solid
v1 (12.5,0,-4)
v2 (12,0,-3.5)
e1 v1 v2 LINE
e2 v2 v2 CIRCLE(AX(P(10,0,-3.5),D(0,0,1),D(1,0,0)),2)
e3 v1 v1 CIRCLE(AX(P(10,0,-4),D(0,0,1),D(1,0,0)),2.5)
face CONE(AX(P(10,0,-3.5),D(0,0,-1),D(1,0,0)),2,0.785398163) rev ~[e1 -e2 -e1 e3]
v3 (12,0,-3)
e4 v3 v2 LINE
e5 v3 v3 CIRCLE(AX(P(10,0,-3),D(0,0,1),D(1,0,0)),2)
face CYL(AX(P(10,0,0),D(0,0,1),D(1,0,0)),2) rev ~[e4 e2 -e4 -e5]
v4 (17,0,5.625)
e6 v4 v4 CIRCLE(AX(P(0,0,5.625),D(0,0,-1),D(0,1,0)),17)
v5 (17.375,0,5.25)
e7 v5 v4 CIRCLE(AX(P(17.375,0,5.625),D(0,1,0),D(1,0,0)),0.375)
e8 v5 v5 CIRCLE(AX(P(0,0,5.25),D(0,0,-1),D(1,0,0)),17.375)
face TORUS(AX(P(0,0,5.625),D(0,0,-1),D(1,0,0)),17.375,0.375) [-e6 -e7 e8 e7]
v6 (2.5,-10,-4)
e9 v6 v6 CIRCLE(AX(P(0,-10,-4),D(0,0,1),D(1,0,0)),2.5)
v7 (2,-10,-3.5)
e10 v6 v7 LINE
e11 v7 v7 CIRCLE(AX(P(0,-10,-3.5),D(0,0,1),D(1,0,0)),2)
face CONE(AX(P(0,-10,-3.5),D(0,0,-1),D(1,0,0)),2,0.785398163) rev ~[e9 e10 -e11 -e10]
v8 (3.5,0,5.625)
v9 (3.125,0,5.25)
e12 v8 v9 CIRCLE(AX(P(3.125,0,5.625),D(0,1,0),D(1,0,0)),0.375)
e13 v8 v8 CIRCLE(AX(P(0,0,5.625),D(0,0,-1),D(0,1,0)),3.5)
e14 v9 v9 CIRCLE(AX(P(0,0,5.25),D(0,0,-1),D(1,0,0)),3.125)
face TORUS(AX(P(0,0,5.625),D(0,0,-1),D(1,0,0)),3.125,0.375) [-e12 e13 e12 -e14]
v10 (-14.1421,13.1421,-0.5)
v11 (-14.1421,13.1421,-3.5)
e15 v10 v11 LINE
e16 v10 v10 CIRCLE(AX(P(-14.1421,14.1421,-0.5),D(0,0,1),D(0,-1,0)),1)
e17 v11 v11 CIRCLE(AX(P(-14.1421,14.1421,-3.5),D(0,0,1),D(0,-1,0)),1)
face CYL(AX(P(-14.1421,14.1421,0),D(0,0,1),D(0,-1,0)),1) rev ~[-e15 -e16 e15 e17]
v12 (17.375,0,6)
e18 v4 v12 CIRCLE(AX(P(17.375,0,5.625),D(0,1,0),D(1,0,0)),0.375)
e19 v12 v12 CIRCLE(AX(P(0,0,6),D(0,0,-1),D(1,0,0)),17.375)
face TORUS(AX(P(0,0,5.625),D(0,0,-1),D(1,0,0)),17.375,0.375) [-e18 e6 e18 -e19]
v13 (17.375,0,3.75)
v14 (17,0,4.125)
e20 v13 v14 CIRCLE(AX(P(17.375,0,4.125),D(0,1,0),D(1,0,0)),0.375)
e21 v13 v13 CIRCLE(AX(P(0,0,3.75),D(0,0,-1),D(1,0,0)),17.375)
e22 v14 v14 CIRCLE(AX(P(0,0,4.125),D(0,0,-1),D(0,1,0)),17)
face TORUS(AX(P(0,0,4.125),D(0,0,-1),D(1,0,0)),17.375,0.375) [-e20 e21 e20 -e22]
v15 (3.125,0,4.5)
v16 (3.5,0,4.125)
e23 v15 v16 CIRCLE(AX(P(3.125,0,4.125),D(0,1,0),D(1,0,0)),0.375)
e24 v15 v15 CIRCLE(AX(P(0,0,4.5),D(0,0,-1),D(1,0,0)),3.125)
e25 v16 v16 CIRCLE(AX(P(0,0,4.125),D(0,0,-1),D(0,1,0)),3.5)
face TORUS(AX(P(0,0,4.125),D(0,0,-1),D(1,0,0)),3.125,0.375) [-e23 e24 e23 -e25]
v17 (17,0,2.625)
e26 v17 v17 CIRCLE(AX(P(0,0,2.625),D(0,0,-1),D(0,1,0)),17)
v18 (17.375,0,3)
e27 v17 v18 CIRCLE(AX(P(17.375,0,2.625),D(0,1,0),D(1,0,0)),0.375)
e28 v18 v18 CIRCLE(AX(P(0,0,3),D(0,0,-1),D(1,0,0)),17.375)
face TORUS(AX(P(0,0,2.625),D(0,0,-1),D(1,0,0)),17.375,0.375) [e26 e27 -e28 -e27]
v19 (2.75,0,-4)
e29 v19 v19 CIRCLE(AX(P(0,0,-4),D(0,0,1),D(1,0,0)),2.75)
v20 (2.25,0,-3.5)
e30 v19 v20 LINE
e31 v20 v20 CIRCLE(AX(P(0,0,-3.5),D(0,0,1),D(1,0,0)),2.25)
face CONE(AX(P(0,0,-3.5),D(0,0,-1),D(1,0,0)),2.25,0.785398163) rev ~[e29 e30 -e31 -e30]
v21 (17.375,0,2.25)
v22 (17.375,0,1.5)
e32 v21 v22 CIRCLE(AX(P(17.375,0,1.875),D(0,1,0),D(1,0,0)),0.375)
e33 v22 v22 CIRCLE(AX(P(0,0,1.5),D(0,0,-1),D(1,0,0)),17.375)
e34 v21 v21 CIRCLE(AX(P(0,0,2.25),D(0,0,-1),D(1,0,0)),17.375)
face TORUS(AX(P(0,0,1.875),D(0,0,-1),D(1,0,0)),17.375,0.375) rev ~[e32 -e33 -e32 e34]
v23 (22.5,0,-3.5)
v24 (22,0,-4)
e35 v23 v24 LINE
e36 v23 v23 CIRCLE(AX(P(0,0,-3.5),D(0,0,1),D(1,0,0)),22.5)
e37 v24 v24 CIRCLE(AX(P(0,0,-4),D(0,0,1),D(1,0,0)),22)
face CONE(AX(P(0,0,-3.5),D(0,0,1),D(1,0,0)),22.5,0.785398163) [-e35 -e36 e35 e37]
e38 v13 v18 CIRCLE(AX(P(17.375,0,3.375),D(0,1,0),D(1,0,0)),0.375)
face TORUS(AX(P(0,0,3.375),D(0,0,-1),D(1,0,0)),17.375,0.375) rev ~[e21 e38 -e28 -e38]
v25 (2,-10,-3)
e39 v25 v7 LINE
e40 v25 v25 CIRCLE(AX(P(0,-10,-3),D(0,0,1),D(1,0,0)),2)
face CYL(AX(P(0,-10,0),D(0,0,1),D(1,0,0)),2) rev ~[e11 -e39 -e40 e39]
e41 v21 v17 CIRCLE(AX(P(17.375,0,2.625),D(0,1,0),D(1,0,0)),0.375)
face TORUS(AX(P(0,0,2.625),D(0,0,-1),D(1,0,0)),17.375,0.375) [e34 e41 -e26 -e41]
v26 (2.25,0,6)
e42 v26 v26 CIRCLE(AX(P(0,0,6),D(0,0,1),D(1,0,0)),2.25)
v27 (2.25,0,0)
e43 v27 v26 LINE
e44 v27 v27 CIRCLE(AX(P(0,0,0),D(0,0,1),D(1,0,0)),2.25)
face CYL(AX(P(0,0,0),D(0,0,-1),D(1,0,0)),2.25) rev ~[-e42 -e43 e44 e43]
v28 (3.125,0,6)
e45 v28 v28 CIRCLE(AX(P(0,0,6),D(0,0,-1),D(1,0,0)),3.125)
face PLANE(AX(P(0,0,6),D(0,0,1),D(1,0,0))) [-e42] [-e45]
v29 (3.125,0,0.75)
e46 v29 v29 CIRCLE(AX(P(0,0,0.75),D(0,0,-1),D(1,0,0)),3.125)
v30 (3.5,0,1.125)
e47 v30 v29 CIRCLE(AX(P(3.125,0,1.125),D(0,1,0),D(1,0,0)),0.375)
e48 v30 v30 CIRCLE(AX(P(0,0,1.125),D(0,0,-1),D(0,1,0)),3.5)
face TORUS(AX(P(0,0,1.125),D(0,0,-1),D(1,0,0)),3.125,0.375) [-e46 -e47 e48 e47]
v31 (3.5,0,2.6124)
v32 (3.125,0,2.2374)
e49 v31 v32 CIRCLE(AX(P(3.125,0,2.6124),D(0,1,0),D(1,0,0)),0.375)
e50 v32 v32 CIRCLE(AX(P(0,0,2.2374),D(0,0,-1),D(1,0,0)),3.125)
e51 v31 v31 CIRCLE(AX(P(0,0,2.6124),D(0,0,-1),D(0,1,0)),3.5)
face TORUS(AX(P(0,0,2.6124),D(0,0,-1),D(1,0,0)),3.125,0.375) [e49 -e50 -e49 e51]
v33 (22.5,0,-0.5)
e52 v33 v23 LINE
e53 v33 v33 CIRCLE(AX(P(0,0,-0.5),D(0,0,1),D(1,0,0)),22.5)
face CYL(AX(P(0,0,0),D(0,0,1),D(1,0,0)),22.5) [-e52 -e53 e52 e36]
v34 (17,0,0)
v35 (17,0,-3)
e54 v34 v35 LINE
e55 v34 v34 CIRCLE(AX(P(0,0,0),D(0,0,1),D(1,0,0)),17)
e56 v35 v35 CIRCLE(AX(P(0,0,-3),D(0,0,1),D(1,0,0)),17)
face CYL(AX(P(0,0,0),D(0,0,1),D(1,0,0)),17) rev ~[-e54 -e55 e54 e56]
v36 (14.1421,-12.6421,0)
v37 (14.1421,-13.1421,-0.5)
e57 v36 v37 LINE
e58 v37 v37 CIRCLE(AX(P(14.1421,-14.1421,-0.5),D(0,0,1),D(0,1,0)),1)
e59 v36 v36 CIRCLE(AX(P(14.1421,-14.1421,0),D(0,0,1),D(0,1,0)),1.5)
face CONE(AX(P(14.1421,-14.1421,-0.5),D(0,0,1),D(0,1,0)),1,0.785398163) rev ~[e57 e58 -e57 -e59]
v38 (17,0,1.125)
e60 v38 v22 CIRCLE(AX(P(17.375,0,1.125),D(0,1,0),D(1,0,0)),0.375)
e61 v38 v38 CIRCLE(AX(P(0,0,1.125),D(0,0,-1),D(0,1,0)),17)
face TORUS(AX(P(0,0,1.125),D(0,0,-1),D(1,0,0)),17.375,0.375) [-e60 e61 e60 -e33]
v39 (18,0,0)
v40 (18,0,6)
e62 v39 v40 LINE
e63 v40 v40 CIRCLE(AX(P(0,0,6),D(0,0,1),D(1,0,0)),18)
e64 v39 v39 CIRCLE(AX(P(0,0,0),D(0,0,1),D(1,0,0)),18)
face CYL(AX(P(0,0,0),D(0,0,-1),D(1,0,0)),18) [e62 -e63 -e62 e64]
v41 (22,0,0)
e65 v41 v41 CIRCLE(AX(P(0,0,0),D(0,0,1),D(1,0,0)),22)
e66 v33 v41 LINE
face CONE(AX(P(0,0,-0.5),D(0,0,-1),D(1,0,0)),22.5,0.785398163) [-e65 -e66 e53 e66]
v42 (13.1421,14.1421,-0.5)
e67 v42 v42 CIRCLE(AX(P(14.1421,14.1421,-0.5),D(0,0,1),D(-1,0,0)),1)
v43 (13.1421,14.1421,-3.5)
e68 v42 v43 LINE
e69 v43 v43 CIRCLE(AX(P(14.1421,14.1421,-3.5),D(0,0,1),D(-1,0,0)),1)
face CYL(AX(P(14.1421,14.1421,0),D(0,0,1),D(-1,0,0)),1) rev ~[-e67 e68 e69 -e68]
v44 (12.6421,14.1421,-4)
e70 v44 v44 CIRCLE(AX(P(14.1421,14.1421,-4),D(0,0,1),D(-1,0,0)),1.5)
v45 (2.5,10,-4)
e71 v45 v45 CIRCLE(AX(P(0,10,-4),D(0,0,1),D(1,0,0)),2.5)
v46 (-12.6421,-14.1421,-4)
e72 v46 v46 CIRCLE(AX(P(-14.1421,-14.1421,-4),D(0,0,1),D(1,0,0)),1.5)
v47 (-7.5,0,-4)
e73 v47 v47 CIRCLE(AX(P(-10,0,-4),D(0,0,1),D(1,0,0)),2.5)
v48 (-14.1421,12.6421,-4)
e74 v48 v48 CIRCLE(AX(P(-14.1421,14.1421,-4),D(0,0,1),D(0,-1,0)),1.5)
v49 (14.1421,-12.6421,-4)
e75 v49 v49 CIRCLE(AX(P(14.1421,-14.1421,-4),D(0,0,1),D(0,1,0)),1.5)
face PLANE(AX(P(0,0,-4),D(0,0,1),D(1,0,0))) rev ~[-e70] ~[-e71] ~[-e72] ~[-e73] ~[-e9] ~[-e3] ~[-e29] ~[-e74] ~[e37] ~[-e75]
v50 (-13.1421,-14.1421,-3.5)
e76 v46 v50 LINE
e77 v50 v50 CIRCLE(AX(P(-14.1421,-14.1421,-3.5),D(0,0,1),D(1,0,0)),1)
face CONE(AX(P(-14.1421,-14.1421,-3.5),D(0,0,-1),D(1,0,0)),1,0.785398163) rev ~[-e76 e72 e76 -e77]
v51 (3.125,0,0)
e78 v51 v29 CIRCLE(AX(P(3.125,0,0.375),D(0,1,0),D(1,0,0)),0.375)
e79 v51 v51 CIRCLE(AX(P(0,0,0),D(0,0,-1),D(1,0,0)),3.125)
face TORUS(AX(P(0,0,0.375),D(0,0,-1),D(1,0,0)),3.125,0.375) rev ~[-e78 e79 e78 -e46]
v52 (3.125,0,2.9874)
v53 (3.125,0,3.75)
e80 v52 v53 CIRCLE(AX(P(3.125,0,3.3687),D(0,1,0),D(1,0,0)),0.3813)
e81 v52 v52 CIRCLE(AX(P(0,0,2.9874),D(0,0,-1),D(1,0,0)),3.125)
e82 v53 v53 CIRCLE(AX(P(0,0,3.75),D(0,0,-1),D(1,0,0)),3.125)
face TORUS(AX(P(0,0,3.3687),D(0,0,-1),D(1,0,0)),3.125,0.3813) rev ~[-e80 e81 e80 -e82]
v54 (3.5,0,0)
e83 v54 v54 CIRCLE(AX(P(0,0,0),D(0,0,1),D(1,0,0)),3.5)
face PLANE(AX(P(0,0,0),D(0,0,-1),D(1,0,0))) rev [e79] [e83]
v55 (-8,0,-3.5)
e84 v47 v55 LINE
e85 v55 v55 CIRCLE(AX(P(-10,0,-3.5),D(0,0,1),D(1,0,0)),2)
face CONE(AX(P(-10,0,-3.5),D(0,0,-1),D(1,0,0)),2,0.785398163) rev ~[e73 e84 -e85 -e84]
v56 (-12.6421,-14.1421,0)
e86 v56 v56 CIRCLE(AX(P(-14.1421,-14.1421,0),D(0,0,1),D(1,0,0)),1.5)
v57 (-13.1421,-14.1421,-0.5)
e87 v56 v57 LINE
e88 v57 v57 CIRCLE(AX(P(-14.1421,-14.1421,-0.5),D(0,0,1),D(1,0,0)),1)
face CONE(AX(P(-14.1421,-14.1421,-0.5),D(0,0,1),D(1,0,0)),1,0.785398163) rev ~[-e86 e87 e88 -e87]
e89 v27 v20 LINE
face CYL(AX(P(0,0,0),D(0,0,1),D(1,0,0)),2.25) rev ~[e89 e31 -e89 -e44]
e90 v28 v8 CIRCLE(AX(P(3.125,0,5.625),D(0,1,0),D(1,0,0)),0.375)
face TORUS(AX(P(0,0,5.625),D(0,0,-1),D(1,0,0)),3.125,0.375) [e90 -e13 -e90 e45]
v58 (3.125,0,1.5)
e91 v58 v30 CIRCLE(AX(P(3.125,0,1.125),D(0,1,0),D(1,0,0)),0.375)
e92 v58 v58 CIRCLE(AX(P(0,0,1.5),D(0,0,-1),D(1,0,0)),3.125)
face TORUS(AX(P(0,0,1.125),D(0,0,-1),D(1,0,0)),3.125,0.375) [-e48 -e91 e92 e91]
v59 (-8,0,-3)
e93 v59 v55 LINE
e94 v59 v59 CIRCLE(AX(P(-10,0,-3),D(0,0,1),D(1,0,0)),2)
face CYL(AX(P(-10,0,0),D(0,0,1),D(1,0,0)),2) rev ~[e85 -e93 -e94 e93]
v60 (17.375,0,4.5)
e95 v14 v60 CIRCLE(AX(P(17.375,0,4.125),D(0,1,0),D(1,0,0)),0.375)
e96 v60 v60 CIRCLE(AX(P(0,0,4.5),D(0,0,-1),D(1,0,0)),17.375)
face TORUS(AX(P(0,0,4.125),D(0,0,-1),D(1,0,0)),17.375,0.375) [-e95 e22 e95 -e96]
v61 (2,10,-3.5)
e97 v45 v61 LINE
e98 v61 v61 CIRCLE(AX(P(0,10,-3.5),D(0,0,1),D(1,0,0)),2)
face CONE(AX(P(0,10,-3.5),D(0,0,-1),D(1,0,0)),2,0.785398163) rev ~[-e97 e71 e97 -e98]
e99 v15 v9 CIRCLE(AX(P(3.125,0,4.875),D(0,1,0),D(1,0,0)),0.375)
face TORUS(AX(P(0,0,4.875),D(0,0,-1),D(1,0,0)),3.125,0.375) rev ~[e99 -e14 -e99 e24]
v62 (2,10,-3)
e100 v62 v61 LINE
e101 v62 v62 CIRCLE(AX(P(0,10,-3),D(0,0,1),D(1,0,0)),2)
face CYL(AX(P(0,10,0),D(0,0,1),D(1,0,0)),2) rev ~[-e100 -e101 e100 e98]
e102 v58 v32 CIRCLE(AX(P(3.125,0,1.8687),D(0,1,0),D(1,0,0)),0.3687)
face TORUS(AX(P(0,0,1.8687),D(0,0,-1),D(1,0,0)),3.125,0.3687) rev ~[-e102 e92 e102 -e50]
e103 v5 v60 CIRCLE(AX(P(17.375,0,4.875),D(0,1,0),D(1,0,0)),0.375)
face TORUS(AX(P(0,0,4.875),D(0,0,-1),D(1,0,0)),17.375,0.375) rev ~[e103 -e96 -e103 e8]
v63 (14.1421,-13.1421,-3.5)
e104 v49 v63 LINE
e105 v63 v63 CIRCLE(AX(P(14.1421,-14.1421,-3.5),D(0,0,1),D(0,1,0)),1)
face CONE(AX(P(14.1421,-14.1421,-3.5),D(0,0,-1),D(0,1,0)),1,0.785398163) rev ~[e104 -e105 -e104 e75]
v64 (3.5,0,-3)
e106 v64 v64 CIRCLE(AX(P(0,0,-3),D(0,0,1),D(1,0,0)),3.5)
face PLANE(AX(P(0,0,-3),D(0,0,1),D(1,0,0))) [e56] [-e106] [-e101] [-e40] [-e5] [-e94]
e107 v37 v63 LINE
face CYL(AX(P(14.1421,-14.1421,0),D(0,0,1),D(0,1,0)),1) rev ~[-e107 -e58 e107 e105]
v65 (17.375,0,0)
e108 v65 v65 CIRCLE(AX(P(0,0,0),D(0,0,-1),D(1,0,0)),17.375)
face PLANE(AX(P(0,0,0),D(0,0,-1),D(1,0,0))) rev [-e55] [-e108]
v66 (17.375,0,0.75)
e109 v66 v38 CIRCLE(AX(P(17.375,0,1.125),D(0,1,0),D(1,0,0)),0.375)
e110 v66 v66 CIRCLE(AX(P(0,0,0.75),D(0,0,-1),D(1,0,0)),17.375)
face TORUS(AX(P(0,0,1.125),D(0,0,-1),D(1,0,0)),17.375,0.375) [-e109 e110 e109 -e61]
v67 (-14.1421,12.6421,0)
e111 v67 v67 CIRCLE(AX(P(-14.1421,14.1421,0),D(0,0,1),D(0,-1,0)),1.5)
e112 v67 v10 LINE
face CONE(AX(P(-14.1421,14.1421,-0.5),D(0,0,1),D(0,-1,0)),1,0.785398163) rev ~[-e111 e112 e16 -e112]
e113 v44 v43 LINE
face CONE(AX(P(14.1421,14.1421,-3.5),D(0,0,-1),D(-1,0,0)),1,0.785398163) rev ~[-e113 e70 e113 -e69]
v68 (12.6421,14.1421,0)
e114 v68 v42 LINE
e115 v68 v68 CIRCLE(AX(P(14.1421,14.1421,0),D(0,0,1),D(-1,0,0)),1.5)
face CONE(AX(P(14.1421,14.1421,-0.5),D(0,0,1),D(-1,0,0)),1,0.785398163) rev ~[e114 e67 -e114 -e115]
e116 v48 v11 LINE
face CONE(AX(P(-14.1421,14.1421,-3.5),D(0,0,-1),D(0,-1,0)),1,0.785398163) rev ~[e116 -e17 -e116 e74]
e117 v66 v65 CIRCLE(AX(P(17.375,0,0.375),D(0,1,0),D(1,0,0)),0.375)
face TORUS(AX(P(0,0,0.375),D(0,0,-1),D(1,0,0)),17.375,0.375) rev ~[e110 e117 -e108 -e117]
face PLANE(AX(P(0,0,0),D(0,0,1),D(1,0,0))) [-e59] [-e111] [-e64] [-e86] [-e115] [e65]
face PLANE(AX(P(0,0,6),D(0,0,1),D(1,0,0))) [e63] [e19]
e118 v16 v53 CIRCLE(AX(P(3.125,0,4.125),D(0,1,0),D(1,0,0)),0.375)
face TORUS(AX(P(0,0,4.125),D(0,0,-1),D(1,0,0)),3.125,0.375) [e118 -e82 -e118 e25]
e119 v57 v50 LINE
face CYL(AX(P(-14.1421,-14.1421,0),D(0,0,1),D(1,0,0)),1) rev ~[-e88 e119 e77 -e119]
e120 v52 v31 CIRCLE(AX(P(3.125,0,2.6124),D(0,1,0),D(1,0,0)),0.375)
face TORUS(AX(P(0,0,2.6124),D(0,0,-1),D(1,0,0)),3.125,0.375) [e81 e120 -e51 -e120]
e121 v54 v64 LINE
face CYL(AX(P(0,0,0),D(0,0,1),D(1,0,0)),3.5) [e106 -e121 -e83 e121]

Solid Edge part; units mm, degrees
sketch "Sketch1" plane through (0, 0, 0) normal (0, 0, 1) x (1, 0, 0)
  circle A0 centre (0, 0) radius 22.5
  circle A1 centre (0, 0) radius 2.25
  dimension "D1" = 20
extrude "Protrusion1" add sketch "Sketch1" against normal blind 4
sketch "Sketch2" plane through (0, 0, 0) normal (0, 0, 1) x (1, 0, 0)
  circle A0 centre (0, 0) radius 18
  circle A1 centre (0, 0) radius 17
  circle A2 centre (0, 0) radius 3.5
  circle A3 centre (0, 0) radius 2.25
  dimension "D1" = 20
extrude "ProtrusiónExtruida_2" add sketch "Sketch2" along normal blind 6
sketch "Sketch3" plane through (0, 0, 0) normal (0, 0, 1) x (1, 0, 0)
  circle A0 centre (-10, 0) radius 2
  circle A1 centre (0, -10) radius 2
  circle A2 centre (10, 0) radius 2
  circle A3 centre (0, 10) radius 2
  dimension "D1" = 20
extrude "Cutout1" cut sketch "Sketch3" against normal through all
sketch "Sketch4" plane through (0, 0, 0) normal (0, 0, 1) x (1, 0, 0)
  circle A0 centre (-14.1421, -14.1421) radius 1
extrude "Cutout2" cut sketch "Sketch4" against normal through all
pattern_circular "Pattern1" count 4 over 360 about axis through (0, 0, 0) along (0, 0, -1) of "Cutout2"
sketch "Sketch5" plane through (0, 0, 0) normal (0, -1, 0) x (1, 0, 0)
  line L0 (3.125, 6) -> (17.375, 6)
  line L1 (3.125, 0) -> (17.375, 0)
  arc A0 (17.375, 5.25) -> (17.375, 6) centre (17.375, 5.625) cw
  arc A1 (17.375, 5.25) -> (17.375, 4.5) centre (17.375, 4.875) cw
  arc A2 (17.375, 3.75) -> (17.375, 4.5) centre (17.375, 4.125) cw
  arc A3 (17.375, 3.75) -> (17.375, 3) centre (17.375, 3.375) cw
  arc A4 (17.375, 2.25) -> (17.375, 3) centre (17.375, 2.625) cw
  arc A5 (17.375, 2.25) -> (17.375, 1.5) centre (17.375, 1.875) cw
  arc A6 (17.375, 0.75) -> (17.375, 1.5) centre (17.375, 1.125) cw
  arc A7 (17.375, 0.75) -> (17.375, 0) centre (17.375, 0.375) cw
  arc A8 (3.125, 0) -> (3.125, 0.75) centre (3.125, 0.375) cw
  arc A9 (3.125, 1.5) -> (3.125, 0.75) centre (3.125, 1.125) cw
  arc A10 (3.125, 1.5) -> (3.125, 2.2374) centre (3.125, 1.8687) cw
  arc A11 (3.125, 2.9874) -> (3.125, 2.2374) centre (3.125, 2.6124) cw
  arc A12 (3.125, 2.9874) -> (3.125, 3.75) centre (3.125, 3.3687) cw
  arc A13 (3.125, 4.5) -> (3.125, 3.75) centre (3.125, 4.125) cw
  arc A14 (3.125, 4.5) -> (3.125, 5.25) centre (3.125, 4.875) cw
  arc A15 (3.125, 6) -> (3.125, 5.25) centre (3.125, 5.625) cw
revolve "RevolvedCutout1" cut sketch "Sketch5" angle 360 about axis through (0, 0, 6) along (0, 0, -1)
sketch "Sketch6" plane through (0, 0, 0) normal (0, 0, 1) x (1, 0, 0)
  circle A0 centre (0, 0) radius 17
  circle A1 centre (0, 0) radius 3.5
  dimension "D1" = 20
extrude "VaciadoExtruido_3" cut sketch "Sketch6" against normal blind 3
chamfer "Chaflán_2" distance 0.5 angle 45 15 edges at (-22.5, 0, 0) (-22.5, 0, -4) (14.1421, -15.1421, 0) (15.1421, 14.1421, 0) (-14.1421, 15.1421, 0) (-15.1421, -14.1421, 0) (2, 10, -4) (-8, 0, -4) (2, -10, -4) (12, 0, -4) (-13.1421, -14.1421, -4) (-14.1421, 13.1421, -4) (13.1421, 14.1421, -4) (14.1421, -13.1421, -4) (-2.25, 0, -4)
